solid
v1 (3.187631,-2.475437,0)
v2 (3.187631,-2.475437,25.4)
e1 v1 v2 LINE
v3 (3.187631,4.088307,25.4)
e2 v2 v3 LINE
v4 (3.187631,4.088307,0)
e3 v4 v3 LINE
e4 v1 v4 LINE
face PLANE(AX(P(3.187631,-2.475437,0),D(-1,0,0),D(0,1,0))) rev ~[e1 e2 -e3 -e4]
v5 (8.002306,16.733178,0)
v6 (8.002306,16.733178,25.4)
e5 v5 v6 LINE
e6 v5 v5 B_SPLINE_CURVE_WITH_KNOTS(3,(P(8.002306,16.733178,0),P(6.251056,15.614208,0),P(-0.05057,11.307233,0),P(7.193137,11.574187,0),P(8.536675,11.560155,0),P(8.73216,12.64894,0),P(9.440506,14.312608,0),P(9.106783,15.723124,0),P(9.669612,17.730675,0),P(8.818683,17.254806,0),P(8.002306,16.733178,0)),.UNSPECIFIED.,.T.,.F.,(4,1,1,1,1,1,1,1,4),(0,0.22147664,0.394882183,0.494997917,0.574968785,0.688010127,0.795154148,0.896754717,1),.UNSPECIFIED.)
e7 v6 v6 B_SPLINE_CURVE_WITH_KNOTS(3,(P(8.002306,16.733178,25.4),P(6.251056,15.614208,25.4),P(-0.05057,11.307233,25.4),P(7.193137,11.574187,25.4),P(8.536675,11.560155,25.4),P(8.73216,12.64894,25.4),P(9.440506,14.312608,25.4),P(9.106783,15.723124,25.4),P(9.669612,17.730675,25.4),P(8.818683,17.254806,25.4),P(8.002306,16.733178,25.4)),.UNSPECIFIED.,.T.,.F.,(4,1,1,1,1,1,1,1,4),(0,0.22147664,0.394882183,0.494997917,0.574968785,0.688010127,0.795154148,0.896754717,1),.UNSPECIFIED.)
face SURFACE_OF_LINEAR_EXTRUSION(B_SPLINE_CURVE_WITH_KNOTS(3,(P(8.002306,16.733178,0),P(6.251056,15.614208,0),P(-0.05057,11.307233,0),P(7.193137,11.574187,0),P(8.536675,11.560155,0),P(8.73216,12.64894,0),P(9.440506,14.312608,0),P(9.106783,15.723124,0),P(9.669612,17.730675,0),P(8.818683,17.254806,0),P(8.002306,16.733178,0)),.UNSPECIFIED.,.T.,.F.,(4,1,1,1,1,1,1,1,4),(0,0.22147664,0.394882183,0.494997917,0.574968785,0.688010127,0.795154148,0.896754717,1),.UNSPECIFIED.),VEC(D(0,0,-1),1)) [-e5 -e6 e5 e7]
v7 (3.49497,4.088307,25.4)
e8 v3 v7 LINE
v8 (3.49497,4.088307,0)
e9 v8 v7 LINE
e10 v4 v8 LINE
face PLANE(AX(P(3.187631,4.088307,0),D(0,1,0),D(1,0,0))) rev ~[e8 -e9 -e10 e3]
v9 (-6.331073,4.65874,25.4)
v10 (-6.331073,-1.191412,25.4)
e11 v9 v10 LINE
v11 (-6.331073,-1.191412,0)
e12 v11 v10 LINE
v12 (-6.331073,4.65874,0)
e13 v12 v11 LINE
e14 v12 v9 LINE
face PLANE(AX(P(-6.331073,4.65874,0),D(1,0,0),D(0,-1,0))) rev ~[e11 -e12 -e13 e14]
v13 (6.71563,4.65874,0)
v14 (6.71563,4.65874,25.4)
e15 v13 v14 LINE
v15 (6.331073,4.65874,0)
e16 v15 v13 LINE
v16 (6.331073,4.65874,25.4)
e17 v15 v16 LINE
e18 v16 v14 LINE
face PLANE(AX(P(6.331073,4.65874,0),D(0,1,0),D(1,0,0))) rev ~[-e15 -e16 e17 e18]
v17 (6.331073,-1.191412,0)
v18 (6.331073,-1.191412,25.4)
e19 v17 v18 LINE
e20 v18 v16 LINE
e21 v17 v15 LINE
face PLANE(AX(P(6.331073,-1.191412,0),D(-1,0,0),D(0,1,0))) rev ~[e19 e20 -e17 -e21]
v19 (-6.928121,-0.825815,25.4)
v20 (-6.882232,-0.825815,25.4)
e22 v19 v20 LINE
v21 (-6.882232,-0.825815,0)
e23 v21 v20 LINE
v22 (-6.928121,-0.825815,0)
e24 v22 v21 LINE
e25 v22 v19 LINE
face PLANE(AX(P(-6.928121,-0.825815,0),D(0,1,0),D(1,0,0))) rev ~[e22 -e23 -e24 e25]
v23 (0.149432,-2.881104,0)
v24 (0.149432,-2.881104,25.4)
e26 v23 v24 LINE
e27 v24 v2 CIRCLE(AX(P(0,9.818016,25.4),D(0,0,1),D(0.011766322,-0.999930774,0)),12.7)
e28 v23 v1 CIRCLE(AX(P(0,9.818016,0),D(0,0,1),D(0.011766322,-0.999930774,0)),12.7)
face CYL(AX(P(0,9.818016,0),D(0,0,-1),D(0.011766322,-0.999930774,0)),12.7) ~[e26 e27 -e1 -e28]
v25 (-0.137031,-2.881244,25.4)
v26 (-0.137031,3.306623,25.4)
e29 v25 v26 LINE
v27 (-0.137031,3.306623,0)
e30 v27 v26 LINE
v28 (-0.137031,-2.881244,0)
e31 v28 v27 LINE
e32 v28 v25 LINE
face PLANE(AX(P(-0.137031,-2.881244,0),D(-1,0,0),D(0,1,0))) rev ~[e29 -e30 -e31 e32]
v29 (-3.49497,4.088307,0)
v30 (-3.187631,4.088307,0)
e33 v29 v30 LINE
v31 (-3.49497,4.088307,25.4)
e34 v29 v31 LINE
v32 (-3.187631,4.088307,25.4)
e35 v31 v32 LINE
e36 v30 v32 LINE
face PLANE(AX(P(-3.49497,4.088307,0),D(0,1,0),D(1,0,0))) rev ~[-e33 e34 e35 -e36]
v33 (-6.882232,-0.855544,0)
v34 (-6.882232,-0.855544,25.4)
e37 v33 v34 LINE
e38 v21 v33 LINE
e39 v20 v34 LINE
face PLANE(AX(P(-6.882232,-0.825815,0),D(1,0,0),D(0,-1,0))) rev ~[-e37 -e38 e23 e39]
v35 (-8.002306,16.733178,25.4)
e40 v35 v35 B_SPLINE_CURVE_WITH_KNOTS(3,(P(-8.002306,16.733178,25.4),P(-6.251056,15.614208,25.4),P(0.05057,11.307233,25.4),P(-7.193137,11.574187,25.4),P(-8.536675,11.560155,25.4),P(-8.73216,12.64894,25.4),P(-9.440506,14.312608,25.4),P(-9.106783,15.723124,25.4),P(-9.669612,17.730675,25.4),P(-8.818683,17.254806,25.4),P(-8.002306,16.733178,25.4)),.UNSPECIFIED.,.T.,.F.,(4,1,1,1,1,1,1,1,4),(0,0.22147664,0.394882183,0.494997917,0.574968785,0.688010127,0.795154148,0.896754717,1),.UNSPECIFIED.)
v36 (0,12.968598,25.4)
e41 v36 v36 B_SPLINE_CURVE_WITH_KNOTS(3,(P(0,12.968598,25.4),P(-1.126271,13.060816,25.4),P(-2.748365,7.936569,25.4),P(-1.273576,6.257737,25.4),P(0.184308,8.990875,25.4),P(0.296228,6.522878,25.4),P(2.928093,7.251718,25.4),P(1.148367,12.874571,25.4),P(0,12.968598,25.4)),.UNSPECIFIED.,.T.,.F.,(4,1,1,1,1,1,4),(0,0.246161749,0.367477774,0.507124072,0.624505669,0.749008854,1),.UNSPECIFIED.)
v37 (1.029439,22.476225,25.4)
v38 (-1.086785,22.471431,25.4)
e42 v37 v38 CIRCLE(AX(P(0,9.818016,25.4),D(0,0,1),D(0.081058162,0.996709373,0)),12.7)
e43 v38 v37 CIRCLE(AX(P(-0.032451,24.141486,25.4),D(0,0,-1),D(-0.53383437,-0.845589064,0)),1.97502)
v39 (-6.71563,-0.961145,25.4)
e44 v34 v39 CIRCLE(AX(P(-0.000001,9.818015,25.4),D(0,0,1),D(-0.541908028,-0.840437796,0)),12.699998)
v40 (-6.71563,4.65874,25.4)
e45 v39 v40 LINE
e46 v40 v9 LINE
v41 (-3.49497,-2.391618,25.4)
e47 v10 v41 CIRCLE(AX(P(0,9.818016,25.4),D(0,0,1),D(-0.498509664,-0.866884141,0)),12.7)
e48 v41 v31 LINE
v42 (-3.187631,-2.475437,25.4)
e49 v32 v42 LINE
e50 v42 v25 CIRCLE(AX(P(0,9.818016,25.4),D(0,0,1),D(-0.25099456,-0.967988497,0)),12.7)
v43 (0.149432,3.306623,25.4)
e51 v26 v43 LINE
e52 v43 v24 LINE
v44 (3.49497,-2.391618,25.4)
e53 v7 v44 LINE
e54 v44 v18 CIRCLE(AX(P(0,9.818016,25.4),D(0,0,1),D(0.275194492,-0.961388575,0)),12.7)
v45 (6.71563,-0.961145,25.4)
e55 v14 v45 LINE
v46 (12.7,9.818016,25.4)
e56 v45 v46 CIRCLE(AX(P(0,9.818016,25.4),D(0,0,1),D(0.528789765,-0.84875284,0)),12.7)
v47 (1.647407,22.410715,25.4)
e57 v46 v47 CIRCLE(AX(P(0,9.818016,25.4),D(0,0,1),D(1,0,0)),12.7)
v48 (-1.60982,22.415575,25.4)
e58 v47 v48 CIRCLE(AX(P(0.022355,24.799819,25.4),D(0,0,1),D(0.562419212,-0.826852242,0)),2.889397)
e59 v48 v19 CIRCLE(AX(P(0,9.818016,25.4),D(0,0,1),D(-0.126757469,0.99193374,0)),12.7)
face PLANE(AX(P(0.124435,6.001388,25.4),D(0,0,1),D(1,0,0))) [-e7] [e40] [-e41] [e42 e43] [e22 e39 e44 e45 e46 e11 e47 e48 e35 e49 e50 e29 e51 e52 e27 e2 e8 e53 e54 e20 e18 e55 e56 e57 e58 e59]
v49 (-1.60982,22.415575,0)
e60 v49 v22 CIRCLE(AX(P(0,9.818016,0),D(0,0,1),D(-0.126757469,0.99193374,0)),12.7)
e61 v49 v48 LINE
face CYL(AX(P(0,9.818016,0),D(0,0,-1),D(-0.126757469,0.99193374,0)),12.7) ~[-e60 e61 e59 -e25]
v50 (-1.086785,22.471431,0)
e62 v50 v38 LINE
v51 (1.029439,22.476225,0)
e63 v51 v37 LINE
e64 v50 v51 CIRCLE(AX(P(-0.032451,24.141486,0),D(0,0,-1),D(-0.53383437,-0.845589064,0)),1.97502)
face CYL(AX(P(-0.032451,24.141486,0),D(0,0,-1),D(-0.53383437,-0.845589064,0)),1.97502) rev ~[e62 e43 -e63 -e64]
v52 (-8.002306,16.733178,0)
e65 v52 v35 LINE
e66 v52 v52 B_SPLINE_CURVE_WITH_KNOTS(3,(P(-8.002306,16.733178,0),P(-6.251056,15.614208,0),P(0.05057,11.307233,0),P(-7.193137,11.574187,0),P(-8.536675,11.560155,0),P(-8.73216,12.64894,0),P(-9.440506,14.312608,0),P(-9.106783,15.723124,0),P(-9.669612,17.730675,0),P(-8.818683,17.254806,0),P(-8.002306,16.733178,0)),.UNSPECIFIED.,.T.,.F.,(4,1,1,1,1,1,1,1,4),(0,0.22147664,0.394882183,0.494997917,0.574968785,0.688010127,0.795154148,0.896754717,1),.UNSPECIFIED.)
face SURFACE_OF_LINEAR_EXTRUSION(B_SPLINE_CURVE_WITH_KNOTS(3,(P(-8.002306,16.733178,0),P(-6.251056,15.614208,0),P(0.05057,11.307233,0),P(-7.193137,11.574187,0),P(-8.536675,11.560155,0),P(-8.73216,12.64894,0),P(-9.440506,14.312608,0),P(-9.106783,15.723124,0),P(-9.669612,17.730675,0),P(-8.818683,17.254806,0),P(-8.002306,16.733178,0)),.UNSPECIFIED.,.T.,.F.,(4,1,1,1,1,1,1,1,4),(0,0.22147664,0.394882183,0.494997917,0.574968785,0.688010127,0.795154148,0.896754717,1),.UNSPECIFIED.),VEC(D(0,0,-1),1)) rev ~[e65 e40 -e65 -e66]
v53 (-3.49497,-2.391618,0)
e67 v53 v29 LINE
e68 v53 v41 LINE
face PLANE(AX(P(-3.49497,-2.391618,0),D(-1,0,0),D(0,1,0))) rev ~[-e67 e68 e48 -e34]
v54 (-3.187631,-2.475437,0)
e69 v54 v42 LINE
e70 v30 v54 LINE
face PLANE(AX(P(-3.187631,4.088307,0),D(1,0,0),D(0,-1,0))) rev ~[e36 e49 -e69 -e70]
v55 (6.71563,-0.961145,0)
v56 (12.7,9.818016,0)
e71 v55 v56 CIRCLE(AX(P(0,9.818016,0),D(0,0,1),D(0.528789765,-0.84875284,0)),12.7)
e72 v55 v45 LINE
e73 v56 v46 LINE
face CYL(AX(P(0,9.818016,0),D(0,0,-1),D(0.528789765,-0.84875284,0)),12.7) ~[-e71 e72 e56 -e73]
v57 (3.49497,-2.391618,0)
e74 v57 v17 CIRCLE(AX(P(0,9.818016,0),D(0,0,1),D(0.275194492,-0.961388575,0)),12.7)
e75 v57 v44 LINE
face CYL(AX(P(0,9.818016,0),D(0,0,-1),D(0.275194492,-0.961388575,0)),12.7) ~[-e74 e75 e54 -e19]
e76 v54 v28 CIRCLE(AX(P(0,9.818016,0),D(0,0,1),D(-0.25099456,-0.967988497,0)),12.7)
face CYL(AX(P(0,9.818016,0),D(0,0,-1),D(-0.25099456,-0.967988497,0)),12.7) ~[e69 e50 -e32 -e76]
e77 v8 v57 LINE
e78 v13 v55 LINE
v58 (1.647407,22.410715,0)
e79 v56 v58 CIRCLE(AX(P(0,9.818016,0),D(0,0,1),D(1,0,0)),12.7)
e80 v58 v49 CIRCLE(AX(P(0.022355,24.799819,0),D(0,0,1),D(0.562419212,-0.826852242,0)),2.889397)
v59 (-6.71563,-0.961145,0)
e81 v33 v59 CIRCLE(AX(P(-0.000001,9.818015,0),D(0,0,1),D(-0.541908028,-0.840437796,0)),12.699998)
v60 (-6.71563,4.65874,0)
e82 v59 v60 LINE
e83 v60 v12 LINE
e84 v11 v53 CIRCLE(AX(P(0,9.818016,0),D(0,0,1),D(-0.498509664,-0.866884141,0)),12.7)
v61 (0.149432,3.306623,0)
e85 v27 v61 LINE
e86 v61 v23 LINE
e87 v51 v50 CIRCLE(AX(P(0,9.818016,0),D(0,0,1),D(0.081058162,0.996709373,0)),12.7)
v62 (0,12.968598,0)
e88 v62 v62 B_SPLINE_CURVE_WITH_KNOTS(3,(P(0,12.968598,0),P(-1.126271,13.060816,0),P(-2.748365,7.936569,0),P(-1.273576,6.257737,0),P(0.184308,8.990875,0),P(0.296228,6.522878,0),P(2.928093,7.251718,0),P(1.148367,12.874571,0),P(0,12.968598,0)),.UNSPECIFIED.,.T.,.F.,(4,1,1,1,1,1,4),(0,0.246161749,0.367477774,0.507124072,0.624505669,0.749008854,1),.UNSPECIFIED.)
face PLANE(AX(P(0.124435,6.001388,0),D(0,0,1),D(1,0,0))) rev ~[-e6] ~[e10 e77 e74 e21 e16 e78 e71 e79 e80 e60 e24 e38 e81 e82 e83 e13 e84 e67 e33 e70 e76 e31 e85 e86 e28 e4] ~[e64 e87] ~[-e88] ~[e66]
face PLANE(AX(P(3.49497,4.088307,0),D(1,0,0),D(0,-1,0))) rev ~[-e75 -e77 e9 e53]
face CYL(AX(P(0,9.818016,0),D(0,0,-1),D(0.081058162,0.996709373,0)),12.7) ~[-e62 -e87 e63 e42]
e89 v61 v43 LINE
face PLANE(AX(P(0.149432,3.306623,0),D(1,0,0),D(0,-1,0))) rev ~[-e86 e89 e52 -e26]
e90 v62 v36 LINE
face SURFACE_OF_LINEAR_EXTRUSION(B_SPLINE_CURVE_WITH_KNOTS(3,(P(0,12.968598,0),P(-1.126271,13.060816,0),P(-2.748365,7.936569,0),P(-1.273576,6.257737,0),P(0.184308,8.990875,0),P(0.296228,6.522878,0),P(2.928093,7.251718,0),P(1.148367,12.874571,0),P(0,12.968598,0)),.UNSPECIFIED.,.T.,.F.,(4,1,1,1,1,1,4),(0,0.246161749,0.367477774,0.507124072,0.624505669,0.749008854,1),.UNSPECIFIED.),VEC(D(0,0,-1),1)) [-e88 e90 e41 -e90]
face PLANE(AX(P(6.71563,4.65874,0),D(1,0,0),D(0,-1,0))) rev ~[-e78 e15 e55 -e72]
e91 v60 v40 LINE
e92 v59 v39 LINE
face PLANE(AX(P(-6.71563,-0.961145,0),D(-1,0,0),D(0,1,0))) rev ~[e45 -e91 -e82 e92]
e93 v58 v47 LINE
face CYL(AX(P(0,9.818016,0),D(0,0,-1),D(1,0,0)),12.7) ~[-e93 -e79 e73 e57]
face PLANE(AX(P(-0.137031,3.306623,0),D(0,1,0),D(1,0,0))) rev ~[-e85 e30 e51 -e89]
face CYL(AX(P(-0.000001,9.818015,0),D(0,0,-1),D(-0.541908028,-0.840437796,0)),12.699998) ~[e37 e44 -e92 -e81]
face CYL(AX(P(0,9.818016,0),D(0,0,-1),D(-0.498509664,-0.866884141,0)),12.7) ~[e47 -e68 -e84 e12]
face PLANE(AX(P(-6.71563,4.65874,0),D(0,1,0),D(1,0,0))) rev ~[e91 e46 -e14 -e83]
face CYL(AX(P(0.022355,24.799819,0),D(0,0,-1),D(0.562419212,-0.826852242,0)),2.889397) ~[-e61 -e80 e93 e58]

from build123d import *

# Parameters (mm, degrees)
F1_DEPTH = 25.4


with BuildPart() as f1:
    # F0 (on Top) → F1 (new body)
    with BuildSketch(Plane.XY):
        with BuildLine():
            ThreePointArc((6.7156300194, -0.961144645), (11.103569274, 3.653541643), (12.7, 9.8180164282))
            ThreePointArc((12.7, 9.8180164282), (9.5449480524, 18.1956035913), (1.6474068226, 22.4107147395))
            ThreePointArc((1.6474068226, 22.4107147395), (1.3388234894, 22.4472504376), (1.0294386506, 22.4762254667))
            ThreePointArc((1.0294386506, 22.4762254667), (-0.028773145, 22.5179838339), (-1.086784862, 22.4714309343))
            ThreePointArc((-1.086784862, 22.4714309343), (-1.3485915697, 22.4462111043), (-1.6098198538, 22.4155749233))
            ThreePointArc((-1.6098198538, 22.4155749233), (-12.3800103209, 12.6509203191), (-6.9281209855, -0.8258146307))
            Line((-6.9281209855, -0.8258146307), (-6.8822319383, -0.8258146307))
            Line((-6.8822319383, -0.8258146307), (-6.8822319383, -0.855543594))
            ThreePointArc((-6.8822319383, -0.855543594), (-6.7991360003, -0.9086675725), (-6.7156300194, -0.961144645))
            Line((-6.7156300194, -0.961144645), (-6.7156300194, 4.6587398687))
            Line((-6.7156300194, 4.6587398687), (-6.3310727347, 4.6587398687))
            Line((-6.3310727347, 4.6587398687), (-6.3310727347, -1.1914121687))
            ThreePointArc((-6.3310727347, -1.1914121687), (-4.9495356332, -1.8777989353), (-3.4949700482, -2.3916184706))
            Line((-3.4949700482, -2.3916184706), (-3.4949700482, 4.0883066069))
            Line((-3.4949700482, 4.0883066069), (-3.1876309074, 4.0883066069))
            Line((-3.1876309074, 4.0883066069), (-3.1876309074, -2.4754374884))
            ThreePointArc((-3.1876309074, -2.4754374884), (-1.6746684307, -2.7710854321), (-0.13703122, -2.8812442765))
            Line((-0.13703122, -2.8812442765), (-0.13703122, 3.3066231491))
            Line((-0.13703122, 3.3066231491), (0.1494322853, 3.3066231491))
            Line((0.1494322853, 3.3066231491), (0.1494322853, -2.8811044072))
            ThreePointArc((0.1494322853, -2.8811044072), (1.6808150107, -2.7702662546), (3.1876309074, -2.4754374884))
            Line((3.1876309074, -2.4754374884), (3.1876309074, 4.0883066069))
            Line((3.1876309074, 4.0883066069), (3.4949700482, 4.0883066069))
            Line((3.4949700482, 4.0883066069), (3.4949700482, -2.3916184706))
            ThreePointArc((3.4949700482, -2.3916184706), (4.9495356332, -1.8777989353), (6.3310727347, -1.1914121687))
            Line((6.3310727347, -1.1914121687), (6.3310727347, 4.6587398687))
            Line((6.3310727347, 4.6587398687), (6.7156300194, 4.6587398687))
            Line((6.7156300194, 4.6587398687), (6.7156300194, -0.961144645))
        make_face()
        with BuildLine():
            add(Edge.make_bspline(
                [(0, 12.9685981976), (-1.1262707569, 13.0608157796), (-2.748365158, 7.936569366), (-1.2735758817, 6.2577367621), (0.1843082925, 8.9908750032), (0.2962277728, 6.5228781858), (2.9280933099, 7.2517179831), (1.1483668305, 12.8745714179), (0, 12.9685981976)],
                knots=[0, 0, 0, 0, 0.2461617493, 0.3674777738, 0.5071240723, 0.6245056694, 0.7490088542, 1, 1, 1, 1], degree=3))
        make_face(mode=Mode.SUBTRACT)
        with BuildLine():
            add(Edge.make_bspline(
                [(-8.0023061995, 16.7331782252), (-6.2510557676, 15.6142079944), (0.0505703268, 11.3072332803), (-7.1931373209, 11.5741872719), (-8.536675253, 11.5601551472), (-8.7321601562, 12.6489403605), (-9.4405060529, 14.3126079871), (-9.1067828933, 15.7231243812), (-9.6696121761, 17.7306750622), (-8.8186828026, 17.2548061427), (-8.0023061995, 16.7331782252)],
                knots=[0, 0, 0, 0, 0.2214766404, 0.3948821826, 0.4949979166, 0.5749687847, 0.6880101274, 0.7951541475, 0.8967547165, 1, 1, 1, 1], degree=3))
        make_face(mode=Mode.SUBTRACT)
        with BuildLine():
            add(Edge.make_bspline(
                [(8.0023061995, 16.7331782252), (6.2510557676, 15.6142079944), (-0.0505703268, 11.3072332803), (7.1931373209, 11.5741872719), (8.536675253, 11.5601551472), (8.7321601562, 12.6489403605), (9.4405060529, 14.3126079871), (9.1067828933, 15.7231243812), (9.6696121761, 17.7306750622), (8.8186828026, 17.2548061427), (8.0023061995, 16.7331782252)],
                knots=[0, 0, 0, 0, 0.2214766404, 0.3948821826, 0.4949979166, 0.5749687847, 0.6880101274, 0.7951541475, 0.8967547165, 1, 1, 1, 1], degree=3))
        make_face(mode=Mode.SUBTRACT)
        with BuildLine():
            ThreePointArc((1.0294386506, 22.4762254667), (1.3388234894, 22.4472504376), (1.6474068226, 22.4107147395))
            ThreePointArc((1.6474068226, 22.4107147395), (0.0266660272, 27.6892120738), (-1.6098198538, 22.4155749233))
            ThreePointArc((-1.6098198538, 22.4155749233), (-1.3485915697, 22.4462111043), (-1.086784862, 22.4714309343))
            ThreePointArc((-1.086784862, 22.4714309343), (-0.0369259735, 26.1165009701), (1.0294386506, 22.4762254667))
        make_face()
    extrude(amount=F1_DEPTH)


solid = f1.part
